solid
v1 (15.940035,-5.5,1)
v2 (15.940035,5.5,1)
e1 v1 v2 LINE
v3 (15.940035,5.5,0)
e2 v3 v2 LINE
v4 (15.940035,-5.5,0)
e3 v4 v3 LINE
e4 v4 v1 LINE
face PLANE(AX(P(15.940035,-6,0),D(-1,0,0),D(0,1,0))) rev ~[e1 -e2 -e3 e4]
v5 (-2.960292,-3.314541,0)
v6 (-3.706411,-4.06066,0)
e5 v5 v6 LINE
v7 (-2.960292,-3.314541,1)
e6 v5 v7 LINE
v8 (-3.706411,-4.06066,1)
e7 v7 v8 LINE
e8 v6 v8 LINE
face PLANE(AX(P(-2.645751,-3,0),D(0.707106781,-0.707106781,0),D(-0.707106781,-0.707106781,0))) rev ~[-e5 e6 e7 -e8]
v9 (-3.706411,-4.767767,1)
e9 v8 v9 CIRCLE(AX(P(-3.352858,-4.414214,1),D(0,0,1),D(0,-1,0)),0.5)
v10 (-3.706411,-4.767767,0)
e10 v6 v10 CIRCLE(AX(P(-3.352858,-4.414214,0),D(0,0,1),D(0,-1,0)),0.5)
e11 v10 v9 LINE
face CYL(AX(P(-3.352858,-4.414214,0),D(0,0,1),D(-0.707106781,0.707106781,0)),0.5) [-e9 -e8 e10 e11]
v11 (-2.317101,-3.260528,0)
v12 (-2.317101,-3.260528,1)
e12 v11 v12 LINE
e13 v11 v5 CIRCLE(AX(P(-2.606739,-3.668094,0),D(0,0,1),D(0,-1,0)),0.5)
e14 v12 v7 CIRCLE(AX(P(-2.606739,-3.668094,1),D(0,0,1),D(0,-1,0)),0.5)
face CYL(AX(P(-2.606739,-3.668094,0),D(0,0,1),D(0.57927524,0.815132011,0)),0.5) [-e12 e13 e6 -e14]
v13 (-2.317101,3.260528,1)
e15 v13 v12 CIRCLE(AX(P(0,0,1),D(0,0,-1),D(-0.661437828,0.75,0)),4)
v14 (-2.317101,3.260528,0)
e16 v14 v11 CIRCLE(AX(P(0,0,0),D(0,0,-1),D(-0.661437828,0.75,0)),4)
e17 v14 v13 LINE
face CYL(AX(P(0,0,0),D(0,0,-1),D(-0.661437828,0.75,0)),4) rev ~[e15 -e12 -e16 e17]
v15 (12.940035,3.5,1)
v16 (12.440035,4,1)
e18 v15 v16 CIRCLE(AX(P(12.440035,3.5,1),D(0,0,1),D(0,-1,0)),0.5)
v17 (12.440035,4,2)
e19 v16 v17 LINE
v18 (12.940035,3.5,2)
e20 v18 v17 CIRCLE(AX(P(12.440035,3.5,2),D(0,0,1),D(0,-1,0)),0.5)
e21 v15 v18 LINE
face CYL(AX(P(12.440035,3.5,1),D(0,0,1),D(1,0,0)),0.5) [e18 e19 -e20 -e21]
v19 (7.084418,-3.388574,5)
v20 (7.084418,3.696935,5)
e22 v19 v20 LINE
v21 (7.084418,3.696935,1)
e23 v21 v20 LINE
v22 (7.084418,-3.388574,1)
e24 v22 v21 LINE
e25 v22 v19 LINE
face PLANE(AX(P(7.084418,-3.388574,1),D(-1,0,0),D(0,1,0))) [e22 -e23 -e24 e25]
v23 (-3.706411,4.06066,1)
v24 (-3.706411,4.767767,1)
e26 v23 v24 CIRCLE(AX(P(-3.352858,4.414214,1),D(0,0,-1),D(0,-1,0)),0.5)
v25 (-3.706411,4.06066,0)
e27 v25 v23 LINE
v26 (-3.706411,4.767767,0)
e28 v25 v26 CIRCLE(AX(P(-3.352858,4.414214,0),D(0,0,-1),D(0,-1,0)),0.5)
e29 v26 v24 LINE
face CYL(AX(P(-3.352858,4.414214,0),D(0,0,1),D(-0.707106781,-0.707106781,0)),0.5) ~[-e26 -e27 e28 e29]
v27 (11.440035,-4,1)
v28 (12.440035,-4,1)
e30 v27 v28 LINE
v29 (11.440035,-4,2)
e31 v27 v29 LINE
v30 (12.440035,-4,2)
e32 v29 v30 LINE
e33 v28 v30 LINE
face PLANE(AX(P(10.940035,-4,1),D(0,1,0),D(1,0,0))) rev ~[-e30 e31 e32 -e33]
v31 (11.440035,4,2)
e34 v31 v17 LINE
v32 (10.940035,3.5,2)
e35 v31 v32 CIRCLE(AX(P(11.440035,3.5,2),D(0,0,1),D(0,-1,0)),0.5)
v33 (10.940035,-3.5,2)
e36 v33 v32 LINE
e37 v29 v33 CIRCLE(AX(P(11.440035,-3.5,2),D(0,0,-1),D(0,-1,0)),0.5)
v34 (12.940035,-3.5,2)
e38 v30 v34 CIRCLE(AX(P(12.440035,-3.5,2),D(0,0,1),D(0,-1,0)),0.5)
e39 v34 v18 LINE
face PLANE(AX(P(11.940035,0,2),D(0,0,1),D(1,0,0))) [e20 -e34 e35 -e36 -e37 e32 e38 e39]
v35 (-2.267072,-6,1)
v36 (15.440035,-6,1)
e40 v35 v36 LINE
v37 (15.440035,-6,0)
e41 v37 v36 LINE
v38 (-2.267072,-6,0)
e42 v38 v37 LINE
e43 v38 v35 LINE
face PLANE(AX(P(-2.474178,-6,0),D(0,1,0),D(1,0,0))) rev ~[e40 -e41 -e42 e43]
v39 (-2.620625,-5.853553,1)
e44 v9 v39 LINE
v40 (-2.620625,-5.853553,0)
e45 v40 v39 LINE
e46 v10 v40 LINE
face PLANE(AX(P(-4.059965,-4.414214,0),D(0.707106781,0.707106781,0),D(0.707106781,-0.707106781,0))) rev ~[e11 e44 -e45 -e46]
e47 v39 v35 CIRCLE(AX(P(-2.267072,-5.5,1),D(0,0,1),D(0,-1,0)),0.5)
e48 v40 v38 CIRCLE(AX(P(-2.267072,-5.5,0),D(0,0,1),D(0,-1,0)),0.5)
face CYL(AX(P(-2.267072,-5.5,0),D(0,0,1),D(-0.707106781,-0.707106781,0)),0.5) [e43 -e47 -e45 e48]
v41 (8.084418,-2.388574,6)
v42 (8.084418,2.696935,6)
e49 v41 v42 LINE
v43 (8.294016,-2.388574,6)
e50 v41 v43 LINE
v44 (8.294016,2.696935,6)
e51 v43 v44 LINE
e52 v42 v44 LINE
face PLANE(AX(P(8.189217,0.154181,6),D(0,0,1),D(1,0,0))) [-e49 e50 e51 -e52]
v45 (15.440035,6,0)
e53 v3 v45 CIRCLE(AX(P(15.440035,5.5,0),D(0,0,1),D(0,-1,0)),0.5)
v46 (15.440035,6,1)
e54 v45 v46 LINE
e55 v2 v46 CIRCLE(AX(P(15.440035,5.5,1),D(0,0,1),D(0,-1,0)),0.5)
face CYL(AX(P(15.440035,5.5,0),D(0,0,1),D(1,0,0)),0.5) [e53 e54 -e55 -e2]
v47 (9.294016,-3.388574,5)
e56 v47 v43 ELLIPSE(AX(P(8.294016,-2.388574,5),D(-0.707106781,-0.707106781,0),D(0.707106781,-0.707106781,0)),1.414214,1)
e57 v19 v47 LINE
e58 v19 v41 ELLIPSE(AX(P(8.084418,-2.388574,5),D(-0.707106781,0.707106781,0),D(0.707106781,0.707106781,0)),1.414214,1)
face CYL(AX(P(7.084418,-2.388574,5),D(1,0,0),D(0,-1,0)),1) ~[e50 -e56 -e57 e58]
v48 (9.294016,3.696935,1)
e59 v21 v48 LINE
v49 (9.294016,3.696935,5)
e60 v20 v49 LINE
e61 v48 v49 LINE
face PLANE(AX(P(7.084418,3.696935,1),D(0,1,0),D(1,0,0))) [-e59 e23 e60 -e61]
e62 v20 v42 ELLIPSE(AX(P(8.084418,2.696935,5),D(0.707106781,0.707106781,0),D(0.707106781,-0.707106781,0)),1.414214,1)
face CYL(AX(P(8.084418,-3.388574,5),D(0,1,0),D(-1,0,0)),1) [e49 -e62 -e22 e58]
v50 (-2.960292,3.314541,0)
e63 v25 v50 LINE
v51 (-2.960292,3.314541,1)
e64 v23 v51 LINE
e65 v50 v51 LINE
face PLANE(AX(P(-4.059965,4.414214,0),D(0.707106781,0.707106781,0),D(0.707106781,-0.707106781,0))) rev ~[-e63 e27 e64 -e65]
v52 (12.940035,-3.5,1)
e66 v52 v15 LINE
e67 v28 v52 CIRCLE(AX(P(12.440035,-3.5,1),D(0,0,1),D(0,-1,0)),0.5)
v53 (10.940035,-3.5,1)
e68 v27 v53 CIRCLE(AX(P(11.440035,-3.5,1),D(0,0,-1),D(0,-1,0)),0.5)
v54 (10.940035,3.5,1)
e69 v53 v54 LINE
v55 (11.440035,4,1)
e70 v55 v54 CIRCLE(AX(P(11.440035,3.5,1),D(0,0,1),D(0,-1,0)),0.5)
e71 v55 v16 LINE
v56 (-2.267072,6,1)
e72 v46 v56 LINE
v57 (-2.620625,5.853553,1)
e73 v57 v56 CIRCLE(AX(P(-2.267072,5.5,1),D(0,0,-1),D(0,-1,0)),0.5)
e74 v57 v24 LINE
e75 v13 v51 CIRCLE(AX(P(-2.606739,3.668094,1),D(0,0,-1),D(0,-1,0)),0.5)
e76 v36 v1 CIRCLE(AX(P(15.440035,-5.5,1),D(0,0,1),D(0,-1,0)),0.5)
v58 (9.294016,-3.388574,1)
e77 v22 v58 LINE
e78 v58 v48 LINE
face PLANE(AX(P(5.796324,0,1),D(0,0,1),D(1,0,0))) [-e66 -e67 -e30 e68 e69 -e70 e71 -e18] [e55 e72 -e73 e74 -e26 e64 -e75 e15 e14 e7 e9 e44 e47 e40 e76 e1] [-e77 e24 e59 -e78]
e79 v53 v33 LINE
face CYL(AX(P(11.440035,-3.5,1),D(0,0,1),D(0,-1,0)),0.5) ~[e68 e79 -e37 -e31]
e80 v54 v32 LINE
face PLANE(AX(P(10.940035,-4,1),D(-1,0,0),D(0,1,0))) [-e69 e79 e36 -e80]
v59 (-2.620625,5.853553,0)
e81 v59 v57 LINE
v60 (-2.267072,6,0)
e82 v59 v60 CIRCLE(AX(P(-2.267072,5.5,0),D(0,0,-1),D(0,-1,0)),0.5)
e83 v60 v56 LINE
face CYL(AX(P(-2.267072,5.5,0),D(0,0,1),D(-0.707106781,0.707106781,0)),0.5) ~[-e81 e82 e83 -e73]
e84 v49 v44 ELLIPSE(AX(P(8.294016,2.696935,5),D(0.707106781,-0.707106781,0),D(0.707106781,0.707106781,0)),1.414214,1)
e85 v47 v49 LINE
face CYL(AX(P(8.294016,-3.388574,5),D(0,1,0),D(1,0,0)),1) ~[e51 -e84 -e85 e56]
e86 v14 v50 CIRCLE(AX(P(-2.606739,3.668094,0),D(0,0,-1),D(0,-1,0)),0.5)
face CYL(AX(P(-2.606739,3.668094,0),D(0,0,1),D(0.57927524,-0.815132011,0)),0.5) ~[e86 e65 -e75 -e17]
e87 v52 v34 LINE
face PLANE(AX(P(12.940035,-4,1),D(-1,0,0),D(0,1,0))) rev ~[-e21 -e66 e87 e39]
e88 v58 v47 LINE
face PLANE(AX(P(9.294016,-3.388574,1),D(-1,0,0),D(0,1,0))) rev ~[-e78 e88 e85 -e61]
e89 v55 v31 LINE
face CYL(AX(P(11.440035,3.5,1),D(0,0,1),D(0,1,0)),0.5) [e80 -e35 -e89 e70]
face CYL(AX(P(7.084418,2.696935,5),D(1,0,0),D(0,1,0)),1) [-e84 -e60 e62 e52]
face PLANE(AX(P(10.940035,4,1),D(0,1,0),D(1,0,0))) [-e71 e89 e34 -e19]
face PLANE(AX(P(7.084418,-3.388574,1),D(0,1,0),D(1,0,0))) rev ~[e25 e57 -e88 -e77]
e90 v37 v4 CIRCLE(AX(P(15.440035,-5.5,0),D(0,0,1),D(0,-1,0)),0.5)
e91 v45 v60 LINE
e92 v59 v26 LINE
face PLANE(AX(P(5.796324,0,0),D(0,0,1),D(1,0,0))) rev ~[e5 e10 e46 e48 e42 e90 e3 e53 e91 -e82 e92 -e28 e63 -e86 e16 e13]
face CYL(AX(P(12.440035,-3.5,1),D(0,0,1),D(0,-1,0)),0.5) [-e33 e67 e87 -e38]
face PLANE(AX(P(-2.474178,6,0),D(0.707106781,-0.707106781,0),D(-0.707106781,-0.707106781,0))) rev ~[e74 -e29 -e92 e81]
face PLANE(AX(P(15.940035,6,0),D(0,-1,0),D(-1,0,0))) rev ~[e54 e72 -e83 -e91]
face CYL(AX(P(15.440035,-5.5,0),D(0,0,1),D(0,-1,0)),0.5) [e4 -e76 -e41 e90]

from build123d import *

# Parameters (mm, degrees)
F1_DEPTH = 1
F2_W     = 2
F2_H     = 8
F3_DEPTH = 1
F4_R     = 0.5
F5_W     = 2.2095986642
F5_H     = 7.0855088998
F6_DEPTH = 5
F7_R     = 1


with BuildPart() as f1:
    # F0 (on Top) → F1 (new body)
    with BuildSketch(Plane.XY):
        with BuildLine():
            ThreePointArc((-2.6457513111, 3), (4, 0), (-2.6457513111, -3))
            Line((-2.6457513111, -3), (-4.0599648734, -4.4142135624))
            Line((-4.0599648734, -4.4142135624), (-2.4741784358, -6))
            Line((-2.4741784358, -6), (15.9400351266, -6))
            Line((15.9400351266, -6), (15.9400351266, 6))
            Line((15.9400351266, 6), (-2.4741784358, 6))
            Line((-2.4741784358, 6), (-4.0599648734, 4.4142135624))
            Line((-4.0599648734, 4.4142135624), (-2.6457513111, 3))
        make_face()
    extrude(amount=F1_DEPTH)

    # F2 (on face) → F3 (join)
    with BuildSketch(Plane.XY.offset(1)):
        with Locations((11.9400351266, 0)):
            Rectangle(F2_W, F2_H)
    extrude(amount=F3_DEPTH)

    # F4
    f4_edges = [f1.edges().sort_by_distance(p)[0] for p in [
        (-2.645751, -3, 0.5),
        (-2.645751, 3, 0.5),
        (-4.059965, -4.414214, 0.5),
        (-2.474178, -6, 0.5),
        (-4.059965, 4.414214, 0.5),
        (-2.474178, 6, 0.5),
        (10.940035, -4, 1.5),
        (12.940035, -4, 1.5),
        (10.940035, 4, 1.5),
        (12.940035, 4, 1.5),
        (15.940035, 6, 0.5),
        (15.940035, -6, 0.5),
    ]]
    fillet(f4_edges, radius=F4_R)

    # F5 (on face) → F6 (join)
    with BuildSketch(Plane.XY.offset(1)):
        with Locations((8.1892169546, 0.1541808015)):
            Rectangle(F5_W, F5_H)
    extrude(amount=F6_DEPTH)

    # F7
    f7_edges = [f1.edges().sort_by_distance(p)[0] for p in [
        (8.189217, 3.696935, 6),
        (7.084418, 0.154181, 6),
        (8.189217, -3.388574, 6),
        (9.294016, 0.154181, 6),
    ]]
    fillet(f7_edges, radius=F7_R)


solid = f1.part
